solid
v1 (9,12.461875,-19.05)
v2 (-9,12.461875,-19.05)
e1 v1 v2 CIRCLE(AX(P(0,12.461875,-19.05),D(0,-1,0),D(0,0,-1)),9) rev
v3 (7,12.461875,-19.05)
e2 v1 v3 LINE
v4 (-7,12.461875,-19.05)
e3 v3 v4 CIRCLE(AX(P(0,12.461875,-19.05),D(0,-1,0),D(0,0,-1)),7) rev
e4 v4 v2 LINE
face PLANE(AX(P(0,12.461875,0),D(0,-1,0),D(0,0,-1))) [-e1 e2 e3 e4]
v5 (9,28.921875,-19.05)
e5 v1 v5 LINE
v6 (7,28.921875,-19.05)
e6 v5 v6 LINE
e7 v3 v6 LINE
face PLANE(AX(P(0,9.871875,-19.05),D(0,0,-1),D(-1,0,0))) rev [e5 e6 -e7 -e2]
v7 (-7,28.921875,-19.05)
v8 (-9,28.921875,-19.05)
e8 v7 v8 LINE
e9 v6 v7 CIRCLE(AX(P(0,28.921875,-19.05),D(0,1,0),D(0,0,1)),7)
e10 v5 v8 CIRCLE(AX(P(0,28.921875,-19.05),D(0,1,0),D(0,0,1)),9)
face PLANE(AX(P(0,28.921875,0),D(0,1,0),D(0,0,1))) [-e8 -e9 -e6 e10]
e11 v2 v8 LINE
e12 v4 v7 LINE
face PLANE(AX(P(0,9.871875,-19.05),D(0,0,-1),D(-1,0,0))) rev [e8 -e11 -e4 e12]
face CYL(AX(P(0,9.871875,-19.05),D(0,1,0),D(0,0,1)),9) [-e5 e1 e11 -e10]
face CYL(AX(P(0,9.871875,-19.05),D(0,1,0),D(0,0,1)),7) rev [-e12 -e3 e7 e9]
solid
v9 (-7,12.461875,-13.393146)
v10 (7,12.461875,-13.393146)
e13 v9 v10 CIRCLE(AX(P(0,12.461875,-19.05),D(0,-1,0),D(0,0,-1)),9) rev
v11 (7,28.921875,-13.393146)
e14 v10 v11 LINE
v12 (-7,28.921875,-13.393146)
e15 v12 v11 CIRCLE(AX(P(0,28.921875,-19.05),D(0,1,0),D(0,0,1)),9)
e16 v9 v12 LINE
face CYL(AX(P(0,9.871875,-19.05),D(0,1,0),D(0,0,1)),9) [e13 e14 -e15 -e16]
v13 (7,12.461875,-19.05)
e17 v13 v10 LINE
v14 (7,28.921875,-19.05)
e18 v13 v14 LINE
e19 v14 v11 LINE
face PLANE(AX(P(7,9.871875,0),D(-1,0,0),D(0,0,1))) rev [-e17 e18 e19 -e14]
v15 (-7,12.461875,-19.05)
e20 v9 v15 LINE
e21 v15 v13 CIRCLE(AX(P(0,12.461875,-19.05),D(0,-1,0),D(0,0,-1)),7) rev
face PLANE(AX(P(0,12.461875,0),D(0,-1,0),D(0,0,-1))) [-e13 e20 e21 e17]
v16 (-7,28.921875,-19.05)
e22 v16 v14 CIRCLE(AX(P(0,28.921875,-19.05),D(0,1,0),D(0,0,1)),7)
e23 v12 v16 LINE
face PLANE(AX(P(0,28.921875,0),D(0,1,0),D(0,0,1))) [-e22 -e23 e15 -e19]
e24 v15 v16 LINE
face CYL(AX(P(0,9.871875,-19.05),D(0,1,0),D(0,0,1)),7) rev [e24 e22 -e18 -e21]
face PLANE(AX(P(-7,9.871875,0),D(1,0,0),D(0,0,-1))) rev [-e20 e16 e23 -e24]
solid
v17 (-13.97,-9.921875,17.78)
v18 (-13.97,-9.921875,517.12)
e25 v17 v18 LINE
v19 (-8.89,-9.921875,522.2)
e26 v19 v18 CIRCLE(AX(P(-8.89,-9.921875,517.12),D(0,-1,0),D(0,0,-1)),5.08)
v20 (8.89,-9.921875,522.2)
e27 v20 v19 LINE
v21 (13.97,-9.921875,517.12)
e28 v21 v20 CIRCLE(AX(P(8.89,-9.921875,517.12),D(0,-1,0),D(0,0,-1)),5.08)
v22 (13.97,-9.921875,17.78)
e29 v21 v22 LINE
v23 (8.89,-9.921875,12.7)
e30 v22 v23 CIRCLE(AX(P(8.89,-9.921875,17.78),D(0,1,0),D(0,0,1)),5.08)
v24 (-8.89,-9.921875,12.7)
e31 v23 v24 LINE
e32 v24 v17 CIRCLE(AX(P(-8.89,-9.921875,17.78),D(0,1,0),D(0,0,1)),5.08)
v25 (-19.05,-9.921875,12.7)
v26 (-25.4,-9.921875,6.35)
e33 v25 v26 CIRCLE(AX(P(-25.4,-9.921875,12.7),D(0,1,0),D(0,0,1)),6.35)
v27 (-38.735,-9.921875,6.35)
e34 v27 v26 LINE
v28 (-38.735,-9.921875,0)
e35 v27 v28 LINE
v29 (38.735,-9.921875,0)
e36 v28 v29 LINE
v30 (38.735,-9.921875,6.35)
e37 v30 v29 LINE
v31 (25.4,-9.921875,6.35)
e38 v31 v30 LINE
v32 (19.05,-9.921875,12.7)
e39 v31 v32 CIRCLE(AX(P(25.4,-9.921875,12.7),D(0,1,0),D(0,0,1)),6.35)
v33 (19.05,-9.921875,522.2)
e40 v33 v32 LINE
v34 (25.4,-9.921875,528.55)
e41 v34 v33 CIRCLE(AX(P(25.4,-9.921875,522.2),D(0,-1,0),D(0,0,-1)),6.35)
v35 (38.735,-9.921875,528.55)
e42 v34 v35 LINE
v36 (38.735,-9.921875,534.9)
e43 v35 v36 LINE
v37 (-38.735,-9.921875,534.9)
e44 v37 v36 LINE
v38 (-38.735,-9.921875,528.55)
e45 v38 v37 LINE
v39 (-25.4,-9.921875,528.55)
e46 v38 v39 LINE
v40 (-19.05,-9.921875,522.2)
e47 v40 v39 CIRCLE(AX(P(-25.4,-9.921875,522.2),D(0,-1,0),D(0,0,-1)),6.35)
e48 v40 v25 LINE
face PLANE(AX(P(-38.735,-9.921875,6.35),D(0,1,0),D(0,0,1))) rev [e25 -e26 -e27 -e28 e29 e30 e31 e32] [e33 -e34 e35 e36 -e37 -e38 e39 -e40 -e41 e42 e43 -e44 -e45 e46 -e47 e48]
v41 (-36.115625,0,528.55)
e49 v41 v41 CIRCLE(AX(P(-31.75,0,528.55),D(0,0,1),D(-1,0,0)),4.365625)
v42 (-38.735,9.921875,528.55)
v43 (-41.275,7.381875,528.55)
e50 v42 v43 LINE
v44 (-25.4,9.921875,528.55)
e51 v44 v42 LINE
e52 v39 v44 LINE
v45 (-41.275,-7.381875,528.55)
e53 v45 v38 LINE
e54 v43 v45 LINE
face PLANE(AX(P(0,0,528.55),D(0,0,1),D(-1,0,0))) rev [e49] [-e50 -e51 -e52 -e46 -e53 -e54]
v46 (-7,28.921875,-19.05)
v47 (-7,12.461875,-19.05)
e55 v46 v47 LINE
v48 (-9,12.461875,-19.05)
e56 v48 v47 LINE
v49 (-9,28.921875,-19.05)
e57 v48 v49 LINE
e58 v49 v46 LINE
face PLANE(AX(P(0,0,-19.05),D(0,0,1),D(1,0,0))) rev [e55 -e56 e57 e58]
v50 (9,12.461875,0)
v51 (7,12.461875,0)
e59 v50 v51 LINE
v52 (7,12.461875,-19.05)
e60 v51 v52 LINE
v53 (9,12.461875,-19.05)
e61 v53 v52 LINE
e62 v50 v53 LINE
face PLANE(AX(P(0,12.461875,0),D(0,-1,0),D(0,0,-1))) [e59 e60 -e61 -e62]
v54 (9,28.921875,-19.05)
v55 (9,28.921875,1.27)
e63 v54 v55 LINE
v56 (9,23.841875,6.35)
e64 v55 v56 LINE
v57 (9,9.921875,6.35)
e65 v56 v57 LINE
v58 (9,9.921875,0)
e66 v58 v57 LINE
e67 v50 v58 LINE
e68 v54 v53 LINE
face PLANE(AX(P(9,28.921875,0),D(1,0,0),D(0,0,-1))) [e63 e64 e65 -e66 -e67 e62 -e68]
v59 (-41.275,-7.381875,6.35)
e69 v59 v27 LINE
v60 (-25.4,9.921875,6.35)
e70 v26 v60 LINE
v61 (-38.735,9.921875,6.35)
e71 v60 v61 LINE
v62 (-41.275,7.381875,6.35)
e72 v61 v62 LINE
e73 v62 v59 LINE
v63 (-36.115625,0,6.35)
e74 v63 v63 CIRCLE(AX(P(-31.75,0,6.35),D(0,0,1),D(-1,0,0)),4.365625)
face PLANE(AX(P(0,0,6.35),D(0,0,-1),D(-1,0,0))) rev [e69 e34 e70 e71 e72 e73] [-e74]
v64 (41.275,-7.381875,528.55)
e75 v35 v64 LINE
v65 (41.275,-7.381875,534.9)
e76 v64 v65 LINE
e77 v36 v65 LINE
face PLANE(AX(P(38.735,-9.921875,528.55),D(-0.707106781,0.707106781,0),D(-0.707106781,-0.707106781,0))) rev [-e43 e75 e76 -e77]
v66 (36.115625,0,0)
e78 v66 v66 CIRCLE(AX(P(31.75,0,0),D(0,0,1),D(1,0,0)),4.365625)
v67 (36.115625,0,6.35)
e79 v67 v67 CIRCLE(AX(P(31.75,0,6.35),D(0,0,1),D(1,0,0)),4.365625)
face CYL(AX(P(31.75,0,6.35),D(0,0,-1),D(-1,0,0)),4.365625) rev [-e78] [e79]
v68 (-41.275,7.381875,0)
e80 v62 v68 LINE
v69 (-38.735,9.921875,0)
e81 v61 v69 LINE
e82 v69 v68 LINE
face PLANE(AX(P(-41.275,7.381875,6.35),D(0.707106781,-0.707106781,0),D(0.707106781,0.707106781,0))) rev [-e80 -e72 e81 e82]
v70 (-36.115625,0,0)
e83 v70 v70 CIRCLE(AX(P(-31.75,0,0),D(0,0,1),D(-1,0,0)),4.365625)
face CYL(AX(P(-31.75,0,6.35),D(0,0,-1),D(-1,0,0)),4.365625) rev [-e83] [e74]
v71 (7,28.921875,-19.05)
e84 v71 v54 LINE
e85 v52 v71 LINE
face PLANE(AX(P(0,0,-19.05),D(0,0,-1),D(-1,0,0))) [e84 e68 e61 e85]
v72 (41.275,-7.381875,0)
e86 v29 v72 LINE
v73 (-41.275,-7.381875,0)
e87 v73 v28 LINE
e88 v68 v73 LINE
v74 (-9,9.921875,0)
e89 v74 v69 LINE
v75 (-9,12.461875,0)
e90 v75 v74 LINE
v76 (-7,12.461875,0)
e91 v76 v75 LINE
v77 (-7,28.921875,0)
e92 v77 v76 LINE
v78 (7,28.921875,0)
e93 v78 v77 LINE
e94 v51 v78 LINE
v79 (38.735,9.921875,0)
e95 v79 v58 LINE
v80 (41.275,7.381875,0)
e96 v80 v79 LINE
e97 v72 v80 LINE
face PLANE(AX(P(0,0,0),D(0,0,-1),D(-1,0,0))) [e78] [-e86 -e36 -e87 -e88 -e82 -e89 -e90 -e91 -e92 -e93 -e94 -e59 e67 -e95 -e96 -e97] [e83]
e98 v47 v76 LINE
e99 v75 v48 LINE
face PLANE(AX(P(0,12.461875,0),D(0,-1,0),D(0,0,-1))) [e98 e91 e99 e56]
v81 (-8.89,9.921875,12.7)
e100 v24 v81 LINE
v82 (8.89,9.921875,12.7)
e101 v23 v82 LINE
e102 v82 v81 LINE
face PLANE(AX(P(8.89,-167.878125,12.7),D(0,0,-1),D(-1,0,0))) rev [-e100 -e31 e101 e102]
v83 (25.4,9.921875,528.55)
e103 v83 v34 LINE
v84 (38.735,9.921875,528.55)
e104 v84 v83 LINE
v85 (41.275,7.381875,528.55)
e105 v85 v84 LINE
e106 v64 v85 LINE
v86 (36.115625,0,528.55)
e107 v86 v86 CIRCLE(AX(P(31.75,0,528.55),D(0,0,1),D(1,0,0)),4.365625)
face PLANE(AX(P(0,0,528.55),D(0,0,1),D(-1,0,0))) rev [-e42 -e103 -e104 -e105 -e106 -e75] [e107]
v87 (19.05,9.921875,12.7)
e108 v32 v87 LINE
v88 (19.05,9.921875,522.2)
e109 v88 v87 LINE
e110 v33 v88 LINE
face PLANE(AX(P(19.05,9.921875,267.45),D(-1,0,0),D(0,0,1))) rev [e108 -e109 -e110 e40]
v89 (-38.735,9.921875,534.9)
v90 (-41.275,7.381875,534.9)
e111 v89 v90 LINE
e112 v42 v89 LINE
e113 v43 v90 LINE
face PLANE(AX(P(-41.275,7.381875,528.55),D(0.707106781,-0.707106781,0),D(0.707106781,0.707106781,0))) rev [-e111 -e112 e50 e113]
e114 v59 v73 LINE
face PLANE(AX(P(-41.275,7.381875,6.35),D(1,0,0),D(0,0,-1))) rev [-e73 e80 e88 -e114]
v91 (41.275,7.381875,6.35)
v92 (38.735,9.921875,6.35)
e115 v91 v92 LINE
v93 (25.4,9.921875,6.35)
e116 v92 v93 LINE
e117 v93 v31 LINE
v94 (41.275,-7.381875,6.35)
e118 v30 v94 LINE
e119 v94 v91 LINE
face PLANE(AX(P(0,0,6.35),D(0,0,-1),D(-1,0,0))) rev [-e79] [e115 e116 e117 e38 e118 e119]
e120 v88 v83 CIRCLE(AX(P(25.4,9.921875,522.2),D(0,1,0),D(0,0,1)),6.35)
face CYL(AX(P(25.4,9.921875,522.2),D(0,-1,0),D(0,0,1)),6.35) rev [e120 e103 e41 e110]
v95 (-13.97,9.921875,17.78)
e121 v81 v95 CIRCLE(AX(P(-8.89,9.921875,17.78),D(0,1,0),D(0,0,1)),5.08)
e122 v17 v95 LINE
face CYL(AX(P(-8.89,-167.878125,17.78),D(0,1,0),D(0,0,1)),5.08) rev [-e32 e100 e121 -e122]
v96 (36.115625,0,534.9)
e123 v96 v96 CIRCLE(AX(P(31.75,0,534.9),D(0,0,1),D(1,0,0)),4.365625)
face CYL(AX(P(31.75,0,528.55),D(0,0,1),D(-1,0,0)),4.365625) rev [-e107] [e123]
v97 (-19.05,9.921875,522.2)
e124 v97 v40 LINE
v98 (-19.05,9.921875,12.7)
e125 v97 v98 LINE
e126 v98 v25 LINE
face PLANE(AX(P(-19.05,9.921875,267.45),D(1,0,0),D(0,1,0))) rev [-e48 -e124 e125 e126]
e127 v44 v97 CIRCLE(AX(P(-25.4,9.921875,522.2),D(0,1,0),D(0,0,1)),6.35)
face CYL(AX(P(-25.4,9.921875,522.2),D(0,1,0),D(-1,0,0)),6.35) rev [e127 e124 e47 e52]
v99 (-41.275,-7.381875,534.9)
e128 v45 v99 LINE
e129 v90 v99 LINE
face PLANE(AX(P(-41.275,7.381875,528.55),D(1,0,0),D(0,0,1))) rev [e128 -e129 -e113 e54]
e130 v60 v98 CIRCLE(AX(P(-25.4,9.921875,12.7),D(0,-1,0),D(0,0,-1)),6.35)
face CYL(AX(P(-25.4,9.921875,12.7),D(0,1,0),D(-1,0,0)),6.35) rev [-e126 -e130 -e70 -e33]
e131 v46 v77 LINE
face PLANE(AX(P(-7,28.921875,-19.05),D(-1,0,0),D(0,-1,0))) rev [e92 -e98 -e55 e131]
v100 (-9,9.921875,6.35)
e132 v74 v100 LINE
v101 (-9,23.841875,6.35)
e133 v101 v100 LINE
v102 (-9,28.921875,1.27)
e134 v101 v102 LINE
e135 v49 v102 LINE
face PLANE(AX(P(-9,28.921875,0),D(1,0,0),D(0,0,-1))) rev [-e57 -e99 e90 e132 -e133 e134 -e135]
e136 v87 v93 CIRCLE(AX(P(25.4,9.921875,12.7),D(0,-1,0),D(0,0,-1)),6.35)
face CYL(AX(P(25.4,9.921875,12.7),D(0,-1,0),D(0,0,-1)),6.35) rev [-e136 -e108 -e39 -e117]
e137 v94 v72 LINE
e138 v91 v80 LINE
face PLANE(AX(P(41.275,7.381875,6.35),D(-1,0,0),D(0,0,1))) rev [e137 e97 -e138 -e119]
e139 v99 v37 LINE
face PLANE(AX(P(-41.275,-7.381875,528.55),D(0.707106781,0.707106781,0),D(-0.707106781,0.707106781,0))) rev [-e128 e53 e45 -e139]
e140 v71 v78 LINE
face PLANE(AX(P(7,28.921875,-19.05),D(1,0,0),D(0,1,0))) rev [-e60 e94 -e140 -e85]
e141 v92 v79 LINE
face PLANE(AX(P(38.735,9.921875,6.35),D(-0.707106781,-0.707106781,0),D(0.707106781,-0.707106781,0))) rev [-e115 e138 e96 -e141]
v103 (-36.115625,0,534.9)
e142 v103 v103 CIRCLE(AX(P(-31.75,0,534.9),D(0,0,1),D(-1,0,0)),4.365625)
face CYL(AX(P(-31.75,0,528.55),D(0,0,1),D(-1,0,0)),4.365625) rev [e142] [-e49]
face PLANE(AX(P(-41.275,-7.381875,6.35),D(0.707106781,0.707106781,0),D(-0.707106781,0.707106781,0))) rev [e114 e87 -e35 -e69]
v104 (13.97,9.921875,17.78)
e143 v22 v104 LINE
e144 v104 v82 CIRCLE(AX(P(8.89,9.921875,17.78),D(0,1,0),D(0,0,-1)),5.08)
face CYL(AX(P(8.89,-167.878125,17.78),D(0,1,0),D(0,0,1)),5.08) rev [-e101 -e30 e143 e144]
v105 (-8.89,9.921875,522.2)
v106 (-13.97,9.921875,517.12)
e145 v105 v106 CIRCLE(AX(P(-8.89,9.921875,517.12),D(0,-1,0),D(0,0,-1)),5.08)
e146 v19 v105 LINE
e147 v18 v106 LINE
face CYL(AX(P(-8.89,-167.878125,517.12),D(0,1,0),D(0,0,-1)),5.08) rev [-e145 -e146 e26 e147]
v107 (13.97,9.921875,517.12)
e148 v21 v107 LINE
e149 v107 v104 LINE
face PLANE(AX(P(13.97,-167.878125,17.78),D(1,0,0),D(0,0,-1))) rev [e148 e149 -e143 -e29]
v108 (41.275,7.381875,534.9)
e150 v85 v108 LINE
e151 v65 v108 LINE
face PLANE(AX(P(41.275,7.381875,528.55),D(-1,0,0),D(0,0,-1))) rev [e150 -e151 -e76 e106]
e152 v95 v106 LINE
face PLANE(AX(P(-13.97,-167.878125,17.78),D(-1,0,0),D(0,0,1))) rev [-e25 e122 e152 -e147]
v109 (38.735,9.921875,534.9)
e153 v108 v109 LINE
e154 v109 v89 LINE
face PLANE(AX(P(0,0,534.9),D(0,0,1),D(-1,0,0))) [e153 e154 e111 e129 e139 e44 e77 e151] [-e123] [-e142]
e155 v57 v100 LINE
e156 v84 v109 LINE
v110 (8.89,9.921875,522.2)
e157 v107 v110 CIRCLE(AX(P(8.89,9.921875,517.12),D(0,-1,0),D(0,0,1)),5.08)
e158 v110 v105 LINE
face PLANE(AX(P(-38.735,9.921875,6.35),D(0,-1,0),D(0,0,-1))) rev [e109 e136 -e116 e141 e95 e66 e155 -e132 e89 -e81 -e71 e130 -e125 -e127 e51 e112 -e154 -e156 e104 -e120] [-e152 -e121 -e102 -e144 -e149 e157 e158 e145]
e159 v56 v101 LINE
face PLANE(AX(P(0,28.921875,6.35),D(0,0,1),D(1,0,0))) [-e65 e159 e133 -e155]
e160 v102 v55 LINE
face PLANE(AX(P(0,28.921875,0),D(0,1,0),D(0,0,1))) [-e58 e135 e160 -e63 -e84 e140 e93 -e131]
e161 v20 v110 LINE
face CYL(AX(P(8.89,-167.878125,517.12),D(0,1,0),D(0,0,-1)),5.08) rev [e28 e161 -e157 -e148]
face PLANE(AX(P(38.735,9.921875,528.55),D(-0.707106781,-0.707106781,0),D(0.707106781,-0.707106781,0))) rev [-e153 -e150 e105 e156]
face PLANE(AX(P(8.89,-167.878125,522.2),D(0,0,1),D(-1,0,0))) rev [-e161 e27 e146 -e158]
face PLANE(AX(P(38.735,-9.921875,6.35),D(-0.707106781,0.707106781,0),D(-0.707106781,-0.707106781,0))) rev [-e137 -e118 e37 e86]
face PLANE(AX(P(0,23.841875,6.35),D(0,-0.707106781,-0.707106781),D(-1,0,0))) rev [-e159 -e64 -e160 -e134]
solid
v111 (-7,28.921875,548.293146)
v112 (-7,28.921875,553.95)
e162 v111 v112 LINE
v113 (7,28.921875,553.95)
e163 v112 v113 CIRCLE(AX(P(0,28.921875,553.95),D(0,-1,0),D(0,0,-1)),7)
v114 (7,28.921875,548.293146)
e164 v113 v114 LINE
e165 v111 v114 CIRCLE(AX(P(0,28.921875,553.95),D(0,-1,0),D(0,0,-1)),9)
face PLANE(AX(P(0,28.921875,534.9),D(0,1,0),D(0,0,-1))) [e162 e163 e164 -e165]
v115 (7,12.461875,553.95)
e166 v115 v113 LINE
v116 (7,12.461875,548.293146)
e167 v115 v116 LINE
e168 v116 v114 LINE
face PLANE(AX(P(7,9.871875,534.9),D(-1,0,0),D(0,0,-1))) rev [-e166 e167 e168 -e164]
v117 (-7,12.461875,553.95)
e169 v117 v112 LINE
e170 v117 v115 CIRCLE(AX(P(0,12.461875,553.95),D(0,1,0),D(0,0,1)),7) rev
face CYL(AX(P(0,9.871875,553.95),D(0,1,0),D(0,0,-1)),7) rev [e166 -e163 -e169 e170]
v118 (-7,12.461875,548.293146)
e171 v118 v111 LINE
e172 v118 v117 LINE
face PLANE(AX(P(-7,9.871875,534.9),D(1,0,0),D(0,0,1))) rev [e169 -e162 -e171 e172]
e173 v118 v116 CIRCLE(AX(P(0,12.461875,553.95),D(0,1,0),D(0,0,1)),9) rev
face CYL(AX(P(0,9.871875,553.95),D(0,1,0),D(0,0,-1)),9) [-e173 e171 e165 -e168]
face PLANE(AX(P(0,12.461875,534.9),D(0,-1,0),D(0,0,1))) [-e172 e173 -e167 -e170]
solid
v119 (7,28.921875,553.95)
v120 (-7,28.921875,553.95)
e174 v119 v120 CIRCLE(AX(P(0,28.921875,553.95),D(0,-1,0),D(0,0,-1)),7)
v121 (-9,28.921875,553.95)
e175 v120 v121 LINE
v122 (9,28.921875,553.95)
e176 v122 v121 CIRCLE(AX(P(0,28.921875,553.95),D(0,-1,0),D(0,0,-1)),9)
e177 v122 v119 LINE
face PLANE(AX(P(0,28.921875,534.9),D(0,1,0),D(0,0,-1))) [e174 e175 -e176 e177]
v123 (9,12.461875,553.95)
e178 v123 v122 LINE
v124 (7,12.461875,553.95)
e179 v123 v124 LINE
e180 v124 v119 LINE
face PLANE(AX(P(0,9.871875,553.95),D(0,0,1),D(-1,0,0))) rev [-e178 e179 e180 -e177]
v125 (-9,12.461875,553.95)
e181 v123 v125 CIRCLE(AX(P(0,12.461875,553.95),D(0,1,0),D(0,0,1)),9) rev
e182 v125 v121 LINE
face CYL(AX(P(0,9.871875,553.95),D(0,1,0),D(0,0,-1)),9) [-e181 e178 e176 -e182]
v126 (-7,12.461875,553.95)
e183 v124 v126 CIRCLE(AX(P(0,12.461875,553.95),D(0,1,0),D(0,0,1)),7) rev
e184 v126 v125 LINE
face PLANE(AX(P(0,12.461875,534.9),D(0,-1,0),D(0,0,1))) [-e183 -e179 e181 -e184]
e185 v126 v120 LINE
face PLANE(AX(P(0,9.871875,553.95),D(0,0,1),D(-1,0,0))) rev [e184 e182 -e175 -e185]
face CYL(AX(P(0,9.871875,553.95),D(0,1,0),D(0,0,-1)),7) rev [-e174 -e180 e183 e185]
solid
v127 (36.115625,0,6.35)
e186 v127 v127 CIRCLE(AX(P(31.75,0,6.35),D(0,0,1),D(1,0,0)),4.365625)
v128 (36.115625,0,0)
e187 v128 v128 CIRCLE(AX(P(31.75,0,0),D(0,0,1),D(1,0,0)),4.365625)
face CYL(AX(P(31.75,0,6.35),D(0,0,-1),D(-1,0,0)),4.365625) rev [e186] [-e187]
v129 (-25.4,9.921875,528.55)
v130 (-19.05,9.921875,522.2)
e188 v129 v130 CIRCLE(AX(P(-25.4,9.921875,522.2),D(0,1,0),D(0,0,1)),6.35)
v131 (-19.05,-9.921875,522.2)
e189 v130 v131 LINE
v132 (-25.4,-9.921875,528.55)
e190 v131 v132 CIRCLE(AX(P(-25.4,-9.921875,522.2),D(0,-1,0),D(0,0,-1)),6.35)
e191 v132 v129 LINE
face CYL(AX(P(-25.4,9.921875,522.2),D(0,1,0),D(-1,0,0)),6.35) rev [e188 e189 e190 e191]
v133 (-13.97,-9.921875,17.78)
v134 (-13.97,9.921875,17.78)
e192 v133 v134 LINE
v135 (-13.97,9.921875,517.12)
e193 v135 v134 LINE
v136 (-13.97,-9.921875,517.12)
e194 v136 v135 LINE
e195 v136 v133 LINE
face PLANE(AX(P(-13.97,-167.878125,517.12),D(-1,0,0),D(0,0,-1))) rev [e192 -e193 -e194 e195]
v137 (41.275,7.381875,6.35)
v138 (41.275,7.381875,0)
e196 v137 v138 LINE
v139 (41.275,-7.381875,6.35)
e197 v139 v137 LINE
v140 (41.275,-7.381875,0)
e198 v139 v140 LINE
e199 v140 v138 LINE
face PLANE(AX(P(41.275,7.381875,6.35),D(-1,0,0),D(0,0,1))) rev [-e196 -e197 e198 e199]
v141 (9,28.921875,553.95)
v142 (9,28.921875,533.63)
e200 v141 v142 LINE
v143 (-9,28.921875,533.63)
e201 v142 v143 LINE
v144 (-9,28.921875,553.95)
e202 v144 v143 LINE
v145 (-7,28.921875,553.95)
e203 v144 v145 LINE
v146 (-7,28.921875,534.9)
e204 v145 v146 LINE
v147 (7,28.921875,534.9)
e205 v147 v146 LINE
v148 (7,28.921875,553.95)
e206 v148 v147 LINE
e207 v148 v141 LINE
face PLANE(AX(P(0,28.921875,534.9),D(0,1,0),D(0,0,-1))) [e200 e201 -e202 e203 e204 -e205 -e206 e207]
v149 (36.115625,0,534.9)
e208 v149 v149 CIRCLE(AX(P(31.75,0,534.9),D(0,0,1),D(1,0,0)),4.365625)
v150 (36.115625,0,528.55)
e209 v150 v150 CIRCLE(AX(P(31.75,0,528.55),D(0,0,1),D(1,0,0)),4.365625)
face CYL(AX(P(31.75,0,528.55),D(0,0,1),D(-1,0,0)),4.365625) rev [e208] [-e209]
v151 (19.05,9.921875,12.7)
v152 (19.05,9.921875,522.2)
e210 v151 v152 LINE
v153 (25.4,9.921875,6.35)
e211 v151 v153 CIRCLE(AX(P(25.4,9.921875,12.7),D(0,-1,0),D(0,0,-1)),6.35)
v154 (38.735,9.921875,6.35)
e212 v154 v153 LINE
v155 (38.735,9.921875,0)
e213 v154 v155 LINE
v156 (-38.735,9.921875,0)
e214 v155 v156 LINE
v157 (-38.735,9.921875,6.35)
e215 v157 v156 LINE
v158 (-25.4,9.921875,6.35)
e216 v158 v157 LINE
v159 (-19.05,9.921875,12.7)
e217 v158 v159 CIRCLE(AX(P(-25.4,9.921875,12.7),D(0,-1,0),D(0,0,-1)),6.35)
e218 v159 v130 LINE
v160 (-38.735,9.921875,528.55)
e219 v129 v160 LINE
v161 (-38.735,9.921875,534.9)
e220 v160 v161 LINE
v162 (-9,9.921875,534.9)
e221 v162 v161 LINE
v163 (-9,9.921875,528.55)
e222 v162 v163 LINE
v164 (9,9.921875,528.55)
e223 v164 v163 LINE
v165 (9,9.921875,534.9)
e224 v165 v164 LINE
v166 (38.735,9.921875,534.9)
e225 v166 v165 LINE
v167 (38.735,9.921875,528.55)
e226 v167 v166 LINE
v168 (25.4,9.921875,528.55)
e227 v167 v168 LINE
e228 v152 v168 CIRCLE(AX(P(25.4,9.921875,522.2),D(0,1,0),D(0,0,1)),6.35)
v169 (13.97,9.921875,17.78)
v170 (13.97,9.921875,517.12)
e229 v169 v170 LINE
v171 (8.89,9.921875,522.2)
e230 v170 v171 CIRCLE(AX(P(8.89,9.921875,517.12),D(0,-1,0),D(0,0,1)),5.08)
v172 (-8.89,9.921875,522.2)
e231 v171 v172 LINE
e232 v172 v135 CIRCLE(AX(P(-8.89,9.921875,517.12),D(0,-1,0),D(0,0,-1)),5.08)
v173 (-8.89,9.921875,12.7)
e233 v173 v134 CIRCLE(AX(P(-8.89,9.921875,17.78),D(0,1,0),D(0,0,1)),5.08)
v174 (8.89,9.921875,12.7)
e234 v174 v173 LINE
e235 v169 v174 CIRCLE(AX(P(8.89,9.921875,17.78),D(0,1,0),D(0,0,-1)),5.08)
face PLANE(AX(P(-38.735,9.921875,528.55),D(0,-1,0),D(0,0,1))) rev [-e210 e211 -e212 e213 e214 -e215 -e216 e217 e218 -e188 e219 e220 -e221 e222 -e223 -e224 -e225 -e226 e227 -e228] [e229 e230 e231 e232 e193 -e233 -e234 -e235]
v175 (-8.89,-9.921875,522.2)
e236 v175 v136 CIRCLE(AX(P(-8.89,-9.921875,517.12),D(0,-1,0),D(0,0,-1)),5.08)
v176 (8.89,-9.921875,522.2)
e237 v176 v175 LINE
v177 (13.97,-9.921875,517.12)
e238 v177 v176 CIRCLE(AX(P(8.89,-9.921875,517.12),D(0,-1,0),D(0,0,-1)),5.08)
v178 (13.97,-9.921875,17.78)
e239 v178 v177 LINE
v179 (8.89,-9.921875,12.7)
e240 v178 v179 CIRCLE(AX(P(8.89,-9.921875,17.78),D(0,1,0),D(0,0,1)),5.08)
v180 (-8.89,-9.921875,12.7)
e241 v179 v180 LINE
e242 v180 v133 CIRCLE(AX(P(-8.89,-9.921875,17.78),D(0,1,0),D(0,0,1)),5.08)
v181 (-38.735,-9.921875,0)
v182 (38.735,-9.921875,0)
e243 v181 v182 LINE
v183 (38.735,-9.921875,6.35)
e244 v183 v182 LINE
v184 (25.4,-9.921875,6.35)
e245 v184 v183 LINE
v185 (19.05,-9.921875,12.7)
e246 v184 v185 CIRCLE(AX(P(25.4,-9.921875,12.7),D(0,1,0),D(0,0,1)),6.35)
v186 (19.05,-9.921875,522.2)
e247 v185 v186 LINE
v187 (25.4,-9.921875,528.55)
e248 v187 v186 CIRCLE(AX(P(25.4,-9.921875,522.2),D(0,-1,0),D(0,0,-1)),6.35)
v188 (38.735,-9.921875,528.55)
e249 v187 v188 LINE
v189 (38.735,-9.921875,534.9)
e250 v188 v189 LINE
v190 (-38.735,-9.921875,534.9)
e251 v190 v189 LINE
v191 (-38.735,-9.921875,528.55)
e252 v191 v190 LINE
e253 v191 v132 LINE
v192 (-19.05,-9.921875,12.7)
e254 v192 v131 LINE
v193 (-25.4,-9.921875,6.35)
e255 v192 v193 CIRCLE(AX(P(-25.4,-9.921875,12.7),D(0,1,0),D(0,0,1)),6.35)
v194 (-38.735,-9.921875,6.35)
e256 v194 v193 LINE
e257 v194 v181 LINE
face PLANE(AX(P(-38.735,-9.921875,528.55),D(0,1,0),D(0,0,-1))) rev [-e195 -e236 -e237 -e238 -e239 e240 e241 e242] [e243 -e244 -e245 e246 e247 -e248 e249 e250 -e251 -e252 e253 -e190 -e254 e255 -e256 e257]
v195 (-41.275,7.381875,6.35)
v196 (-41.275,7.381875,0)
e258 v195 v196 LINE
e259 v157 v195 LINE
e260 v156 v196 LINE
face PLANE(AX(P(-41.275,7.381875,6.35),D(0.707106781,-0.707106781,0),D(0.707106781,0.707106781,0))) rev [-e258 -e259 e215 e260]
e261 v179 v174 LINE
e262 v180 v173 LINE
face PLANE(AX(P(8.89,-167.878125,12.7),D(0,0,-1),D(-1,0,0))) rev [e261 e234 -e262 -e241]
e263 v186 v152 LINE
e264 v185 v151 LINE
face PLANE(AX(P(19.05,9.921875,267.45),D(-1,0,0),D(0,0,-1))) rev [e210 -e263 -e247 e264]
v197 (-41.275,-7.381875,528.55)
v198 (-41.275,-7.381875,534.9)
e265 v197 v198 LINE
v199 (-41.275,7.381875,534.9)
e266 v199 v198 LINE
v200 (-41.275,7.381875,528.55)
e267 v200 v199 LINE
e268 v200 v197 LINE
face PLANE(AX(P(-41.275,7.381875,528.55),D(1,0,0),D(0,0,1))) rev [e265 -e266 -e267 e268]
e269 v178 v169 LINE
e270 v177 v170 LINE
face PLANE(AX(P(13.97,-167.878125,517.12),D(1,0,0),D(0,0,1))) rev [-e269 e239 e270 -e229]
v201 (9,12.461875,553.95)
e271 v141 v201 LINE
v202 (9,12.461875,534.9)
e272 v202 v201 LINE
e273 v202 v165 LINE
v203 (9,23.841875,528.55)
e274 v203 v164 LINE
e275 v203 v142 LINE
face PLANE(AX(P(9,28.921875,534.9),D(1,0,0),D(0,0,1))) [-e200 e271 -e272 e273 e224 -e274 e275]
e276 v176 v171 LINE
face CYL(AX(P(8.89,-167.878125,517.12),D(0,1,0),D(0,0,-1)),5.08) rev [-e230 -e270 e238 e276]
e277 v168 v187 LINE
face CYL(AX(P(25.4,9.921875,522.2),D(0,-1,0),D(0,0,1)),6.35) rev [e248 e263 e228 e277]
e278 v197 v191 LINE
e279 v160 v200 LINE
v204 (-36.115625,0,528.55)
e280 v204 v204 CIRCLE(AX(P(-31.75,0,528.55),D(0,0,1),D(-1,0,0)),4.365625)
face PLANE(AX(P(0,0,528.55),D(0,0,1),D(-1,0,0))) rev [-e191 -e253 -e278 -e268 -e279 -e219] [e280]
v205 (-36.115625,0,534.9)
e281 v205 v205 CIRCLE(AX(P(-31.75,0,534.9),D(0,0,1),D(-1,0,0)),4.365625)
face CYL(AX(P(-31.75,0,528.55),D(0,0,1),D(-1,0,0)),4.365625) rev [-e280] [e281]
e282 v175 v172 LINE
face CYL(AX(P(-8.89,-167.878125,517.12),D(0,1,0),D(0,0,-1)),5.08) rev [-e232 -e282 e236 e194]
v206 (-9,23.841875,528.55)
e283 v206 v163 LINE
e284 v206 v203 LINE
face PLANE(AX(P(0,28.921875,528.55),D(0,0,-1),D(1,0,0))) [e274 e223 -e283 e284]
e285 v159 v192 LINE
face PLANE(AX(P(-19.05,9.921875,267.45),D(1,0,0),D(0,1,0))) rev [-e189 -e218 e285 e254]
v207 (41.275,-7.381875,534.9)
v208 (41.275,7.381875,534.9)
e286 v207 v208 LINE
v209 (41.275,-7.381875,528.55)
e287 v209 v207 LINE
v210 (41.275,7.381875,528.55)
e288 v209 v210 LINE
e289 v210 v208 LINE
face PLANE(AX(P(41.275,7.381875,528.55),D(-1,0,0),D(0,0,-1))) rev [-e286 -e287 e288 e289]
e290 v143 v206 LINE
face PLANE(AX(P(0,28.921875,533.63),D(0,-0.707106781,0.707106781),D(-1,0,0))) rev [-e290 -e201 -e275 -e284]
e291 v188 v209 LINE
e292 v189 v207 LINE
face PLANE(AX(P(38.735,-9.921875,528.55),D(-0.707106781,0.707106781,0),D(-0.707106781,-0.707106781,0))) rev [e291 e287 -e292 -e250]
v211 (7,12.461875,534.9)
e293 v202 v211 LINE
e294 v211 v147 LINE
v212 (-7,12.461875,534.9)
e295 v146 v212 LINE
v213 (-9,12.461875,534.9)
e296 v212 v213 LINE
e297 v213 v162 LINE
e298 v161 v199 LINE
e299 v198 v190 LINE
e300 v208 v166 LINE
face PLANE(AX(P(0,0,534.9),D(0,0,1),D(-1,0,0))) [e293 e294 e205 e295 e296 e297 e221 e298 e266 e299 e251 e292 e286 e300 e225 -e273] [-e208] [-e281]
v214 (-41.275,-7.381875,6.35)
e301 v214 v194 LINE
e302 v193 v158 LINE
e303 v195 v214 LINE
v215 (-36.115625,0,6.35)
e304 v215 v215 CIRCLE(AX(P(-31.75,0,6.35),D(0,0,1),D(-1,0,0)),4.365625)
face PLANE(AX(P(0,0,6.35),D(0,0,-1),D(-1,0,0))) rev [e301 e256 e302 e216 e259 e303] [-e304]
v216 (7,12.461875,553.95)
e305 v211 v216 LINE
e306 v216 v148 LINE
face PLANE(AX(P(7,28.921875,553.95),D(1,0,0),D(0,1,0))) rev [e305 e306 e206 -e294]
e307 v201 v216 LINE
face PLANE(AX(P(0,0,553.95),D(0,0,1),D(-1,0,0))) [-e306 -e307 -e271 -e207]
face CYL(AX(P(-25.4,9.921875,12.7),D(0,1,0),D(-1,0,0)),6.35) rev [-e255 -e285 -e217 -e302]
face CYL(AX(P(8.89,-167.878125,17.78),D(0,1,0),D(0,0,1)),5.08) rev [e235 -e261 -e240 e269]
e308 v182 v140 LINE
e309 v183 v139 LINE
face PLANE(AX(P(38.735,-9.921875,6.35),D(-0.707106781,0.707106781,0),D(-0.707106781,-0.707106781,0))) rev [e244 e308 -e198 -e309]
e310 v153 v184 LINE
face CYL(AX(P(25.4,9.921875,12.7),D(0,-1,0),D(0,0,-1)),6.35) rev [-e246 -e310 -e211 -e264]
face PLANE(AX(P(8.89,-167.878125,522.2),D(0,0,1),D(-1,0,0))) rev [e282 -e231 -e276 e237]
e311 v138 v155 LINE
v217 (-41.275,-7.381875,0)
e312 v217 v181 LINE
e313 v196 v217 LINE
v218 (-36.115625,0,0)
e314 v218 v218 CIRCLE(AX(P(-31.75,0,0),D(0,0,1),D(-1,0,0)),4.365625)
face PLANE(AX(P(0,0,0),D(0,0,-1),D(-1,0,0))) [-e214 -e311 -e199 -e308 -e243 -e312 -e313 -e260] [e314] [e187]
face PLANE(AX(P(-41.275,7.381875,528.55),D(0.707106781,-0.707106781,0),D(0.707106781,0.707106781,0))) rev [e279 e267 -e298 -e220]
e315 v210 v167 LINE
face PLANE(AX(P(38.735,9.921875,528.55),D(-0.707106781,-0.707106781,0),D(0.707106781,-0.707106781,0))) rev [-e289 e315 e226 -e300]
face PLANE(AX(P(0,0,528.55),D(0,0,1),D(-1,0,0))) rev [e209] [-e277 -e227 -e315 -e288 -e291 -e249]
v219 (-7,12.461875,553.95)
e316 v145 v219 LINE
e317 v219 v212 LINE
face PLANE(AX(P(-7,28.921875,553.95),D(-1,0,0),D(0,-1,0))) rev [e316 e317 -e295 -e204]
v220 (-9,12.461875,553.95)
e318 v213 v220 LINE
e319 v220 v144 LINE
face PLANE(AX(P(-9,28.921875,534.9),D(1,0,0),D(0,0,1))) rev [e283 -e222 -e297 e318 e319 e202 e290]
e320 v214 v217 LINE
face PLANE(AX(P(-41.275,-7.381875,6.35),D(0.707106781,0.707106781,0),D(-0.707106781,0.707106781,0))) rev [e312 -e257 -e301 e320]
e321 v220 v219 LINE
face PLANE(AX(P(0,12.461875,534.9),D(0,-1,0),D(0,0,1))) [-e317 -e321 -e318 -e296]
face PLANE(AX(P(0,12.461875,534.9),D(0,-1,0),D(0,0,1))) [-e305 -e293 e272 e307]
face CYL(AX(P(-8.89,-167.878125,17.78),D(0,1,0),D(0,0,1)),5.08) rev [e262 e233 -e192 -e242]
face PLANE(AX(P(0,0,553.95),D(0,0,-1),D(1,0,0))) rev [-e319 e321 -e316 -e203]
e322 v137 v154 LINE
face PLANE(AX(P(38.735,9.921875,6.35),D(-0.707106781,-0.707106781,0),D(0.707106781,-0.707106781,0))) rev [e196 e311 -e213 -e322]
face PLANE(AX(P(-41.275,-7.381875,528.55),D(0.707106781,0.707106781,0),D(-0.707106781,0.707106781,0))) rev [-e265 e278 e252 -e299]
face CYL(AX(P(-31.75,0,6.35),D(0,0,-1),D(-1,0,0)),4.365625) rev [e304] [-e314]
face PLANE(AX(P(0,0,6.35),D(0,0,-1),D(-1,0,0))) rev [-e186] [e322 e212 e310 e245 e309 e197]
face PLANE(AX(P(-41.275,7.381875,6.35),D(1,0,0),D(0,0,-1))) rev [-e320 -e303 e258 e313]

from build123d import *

# Parameters (mm, degrees)
SKETCH1_R              = 4.365625
BOSS_EXTRUDE1_DEPTH    = 6.35
SKETCH2_W              = 38.1
SKETCH2_H              = 19.84375
BOSS_EXTRUDE2_DEPTH    = 261.1
FILLET1_R              = 6.35
CUT_EXTRUDE1_DEPTH     = 177.8
SKETCH4_W              = 18
SKETCH4_H              = 6.35
BOSS_EXTRUDE3_DEPTH    = 19
SKETCH5_W              = 2
SKETCH5_H              = 19
BOSS_EXTRUDE4_DEPTH    = 19.05
BOSS_EXTRUDE6_DEPTH    = 19.05
BOSS_EXTRUDE6_2_DEPTH  = 19.05
CUT_EXTRUDE3_START     = -2.54
CUT_EXTRUDE3_OUTLINE_R = 7
CUT_EXTRUDE3_DEPTH     = 2.59
CHAMFER1_SIZE          = 5.08
CHAMFER2_SIZE          = 5.08


# Read off the part's stored shape, not the designer's step: Cut-Extrude3
with BuildPart() as part:
    # Sketch1 → Boss-Extrude1 (new body)
    with BuildSketch(Plane.XY):
        Polygon((-41.275, 7.381875), (-38.735, 9.921875), (38.735, 9.921875), (41.275, 7.381875), (41.275, -7.381875), (38.735, -9.921875), (-38.735, -9.921875), (-41.275, -7.381875), align=None)
        with Locations((31.75, 0)):
            Circle(SKETCH1_R, mode=Mode.SUBTRACT)
        with Locations(Location((-31.75, 0, 0), (0, 0, 180))):
            Circle(SKETCH1_R, mode=Mode.SUBTRACT)
    extrude(amount=BOSS_EXTRUDE1_DEPTH)

    # Sketch2 → Boss-Extrude2 (add)
    with BuildSketch(Plane.XY.offset(6.35)):
        Rectangle(SKETCH2_W, SKETCH2_H)
    extrude(amount=BOSS_EXTRUDE2_DEPTH)

    # Fillet1
    fillet1_edges = [part.edges().sort_by_distance(p)[0] for p in [
        (-19.05, 0, 6.35),
        (19.05, 0, 6.35),
    ]]
    fillet(fillet1_edges, radius=FILLET1_R)

    # Sketch3 → Cut-Extrude1 (cut)
    with BuildSketch(Plane(origin=(0, 9.921875, 0), x_dir=(1, 0, 0), z_dir=(0, 1, 0))):
        with BuildLine():
            Line((8.89, -12.7), (-8.89, -12.7))
            ThreePointArc((-8.89, -12.7), (-12.482102448, -14.187897552), (-13.97, -17.78))
            Line((-13.97, -17.78), (-13.97, -350.52))
            ThreePointArc((-13.97, -350.52), (-12.482102448, -354.112102448), (-8.89, -355.6))
            Line((-8.89, -355.6), (8.89, -355.6))
            ThreePointArc((8.89, -355.6), (12.482102448, -354.112102448), (13.97, -350.52))
            Line((13.97, -350.52), (13.97, -17.78))
            ThreePointArc((13.97, -17.78), (12.482102448, -14.187897552), (8.89, -12.7))
        make_face()
    extrude(amount=-CUT_EXTRUDE1_DEPTH, mode=Mode.SUBTRACT)

    # Mirror2: part across plane


with BuildPart() as part_1:
    add(part.part)
    add(part.part.mirror(Plane.XY.offset(267.45)))

    # Sketch4 → Boss-Extrude3 (add)
    with BuildSketch(Plane(origin=(0, 9.921875, 0), x_dir=(1, 0, 0), z_dir=(0, 1, 0))):
        with Locations((0, -3.175)):
            Rectangle(SKETCH4_W, SKETCH4_H)
    extrude(amount=BOSS_EXTRUDE3_DEPTH)

    # Sketch5 → Boss-Extrude4 (add)
    with BuildSketch(Plane(origin=(0, 0, 0), x_dir=(-1, 0, 0), z_dir=(0, 0, -1))):
        with Locations((-8, 19.421875)):
            Rectangle(SKETCH5_W, SKETCH5_H)
        with Locations((8, 19.421875)):
            Rectangle(SKETCH5_W, SKETCH5_H)
    extrude(amount=BOSS_EXTRUDE4_DEPTH)


with BuildPart() as body_2:
    # Sketch6 → Boss-Extrude6 (new body)
    with BuildSketch(Plane(origin=(0, 28.921875, 0), x_dir=(1, 0, 0), z_dir=(0, 1, 0))):
        with BuildLine():
            Line((7, 13.393145751), (7, 19.05))
            ThreePointArc((7, 19.05), (0, 12.05), (-7, 19.05))
            Line((-7, 19.05), (-7, 13.393145751))
            ThreePointArc((-7, 13.393145751), (0, 10.05), (7, 13.393145751))
        make_face()
    extrude(amount=-BOSS_EXTRUDE6_DEPTH)


with BuildPart() as body_3:
    # Sketch6 → Boss-Extrude6 2 (new body)
    with BuildSketch(Plane(origin=(0, 28.921875, 0), x_dir=(1, 0, 0), z_dir=(0, 1, 0))):
        with BuildLine():
            ThreePointArc((9, 19.05), (0, 28.05), (-9, 19.05))
            Line((-9, 19.05), (-7, 19.05))
            ThreePointArc((-7, 19.05), (0, 26.05), (7, 19.05))
            Line((7, 19.05), (9, 19.05))
        make_face()
    extrude(amount=-BOSS_EXTRUDE6_2_DEPTH)


with BuildPart() as cut_extrude3_tool:
    # Cut-Extrude3 outline → Cut-Extrude3 (new body)
    with BuildSketch(Plane(origin=(0, 9.921875, 0), x_dir=(-1, 0, 0), z_dir=(0, -1, 0)).offset(CUT_EXTRUDE3_START)):
        with BuildLine():
            Line((9, 0), (9, 19.05))
            ThreePointArc((9, 19.05), (0, 28.05), (-9, 19.05))
            Line((-9, 19.05), (-9, 0))
            Line((-9, 0), (-7, 0))
            Line((-7, 0), (-7, 13.393145751))
            ThreePointArc((-7, 13.393145751), (0, 10.05), (7, 13.393145751))
            Line((7, 13.393145751), (7, 0))
            Line((7, 0), (9, 0))
        make_face()
        with Locations((0, 19.05)):
            Circle(CUT_EXTRUDE3_OUTLINE_R, mode=Mode.SUBTRACT)
    extrude(amount=CUT_EXTRUDE3_DEPTH)


with BuildPart() as part_2:
    add(part_1.part)

    # Cut-Extrude3: cut by cut_extrude3_tool
    add(cut_extrude3_tool.part, mode=Mode.SUBTRACT)


with BuildPart() as body_2_1:
    add(body_2.part)

    # Cut-Extrude3: cut by cut_extrude3_tool
    add(cut_extrude3_tool.part, mode=Mode.SUBTRACT)


with BuildPart() as body_3_1:
    add(body_3.part)

    # Cut-Extrude3: cut by cut_extrude3_tool
    add(cut_extrude3_tool.part, mode=Mode.SUBTRACT)


with BuildPart() as body_4:
    # Mirror9: mirrored copy
    add(part_2.part.mirror(Plane(origin=(0, 0, 267.45), x_dir=(1, 0, 0), z_dir=(0, 0, -1))))

    # Chamfer2
    chamfer2_edges = [body_4.edges().sort_by_distance(p)[0] for p in [
        (0, 28.921875, 528.55),
    ]]
    chamfer(chamfer2_edges, length=CHAMFER2_SIZE)


with BuildPart() as body_5:
    # Mirror10: mirrored copy
    add(body_3_1.part.mirror(Plane(origin=(0, 0, 267.45), x_dir=(1, 0, 0), z_dir=(0, 0, -1))))


with BuildPart() as body_6:
    # Mirror10 2: mirrored copy
    add(body_2_1.part.mirror(Plane(origin=(0, 0, 267.45), x_dir=(1, 0, 0), z_dir=(0, 0, -1))))


with BuildPart() as part_3:
    add(part_2.part)

    # Chamfer1
    chamfer1_edges = [part_3.edges().sort_by_distance(p)[0] for p in [
        (0, 28.921875, 6.35),
    ]]
    chamfer(chamfer1_edges, length=CHAMFER1_SIZE)


solid = Compound([body_2_1.part, body_3_1.part, body_4.part, body_5.part, body_6.part, part_3.part])
